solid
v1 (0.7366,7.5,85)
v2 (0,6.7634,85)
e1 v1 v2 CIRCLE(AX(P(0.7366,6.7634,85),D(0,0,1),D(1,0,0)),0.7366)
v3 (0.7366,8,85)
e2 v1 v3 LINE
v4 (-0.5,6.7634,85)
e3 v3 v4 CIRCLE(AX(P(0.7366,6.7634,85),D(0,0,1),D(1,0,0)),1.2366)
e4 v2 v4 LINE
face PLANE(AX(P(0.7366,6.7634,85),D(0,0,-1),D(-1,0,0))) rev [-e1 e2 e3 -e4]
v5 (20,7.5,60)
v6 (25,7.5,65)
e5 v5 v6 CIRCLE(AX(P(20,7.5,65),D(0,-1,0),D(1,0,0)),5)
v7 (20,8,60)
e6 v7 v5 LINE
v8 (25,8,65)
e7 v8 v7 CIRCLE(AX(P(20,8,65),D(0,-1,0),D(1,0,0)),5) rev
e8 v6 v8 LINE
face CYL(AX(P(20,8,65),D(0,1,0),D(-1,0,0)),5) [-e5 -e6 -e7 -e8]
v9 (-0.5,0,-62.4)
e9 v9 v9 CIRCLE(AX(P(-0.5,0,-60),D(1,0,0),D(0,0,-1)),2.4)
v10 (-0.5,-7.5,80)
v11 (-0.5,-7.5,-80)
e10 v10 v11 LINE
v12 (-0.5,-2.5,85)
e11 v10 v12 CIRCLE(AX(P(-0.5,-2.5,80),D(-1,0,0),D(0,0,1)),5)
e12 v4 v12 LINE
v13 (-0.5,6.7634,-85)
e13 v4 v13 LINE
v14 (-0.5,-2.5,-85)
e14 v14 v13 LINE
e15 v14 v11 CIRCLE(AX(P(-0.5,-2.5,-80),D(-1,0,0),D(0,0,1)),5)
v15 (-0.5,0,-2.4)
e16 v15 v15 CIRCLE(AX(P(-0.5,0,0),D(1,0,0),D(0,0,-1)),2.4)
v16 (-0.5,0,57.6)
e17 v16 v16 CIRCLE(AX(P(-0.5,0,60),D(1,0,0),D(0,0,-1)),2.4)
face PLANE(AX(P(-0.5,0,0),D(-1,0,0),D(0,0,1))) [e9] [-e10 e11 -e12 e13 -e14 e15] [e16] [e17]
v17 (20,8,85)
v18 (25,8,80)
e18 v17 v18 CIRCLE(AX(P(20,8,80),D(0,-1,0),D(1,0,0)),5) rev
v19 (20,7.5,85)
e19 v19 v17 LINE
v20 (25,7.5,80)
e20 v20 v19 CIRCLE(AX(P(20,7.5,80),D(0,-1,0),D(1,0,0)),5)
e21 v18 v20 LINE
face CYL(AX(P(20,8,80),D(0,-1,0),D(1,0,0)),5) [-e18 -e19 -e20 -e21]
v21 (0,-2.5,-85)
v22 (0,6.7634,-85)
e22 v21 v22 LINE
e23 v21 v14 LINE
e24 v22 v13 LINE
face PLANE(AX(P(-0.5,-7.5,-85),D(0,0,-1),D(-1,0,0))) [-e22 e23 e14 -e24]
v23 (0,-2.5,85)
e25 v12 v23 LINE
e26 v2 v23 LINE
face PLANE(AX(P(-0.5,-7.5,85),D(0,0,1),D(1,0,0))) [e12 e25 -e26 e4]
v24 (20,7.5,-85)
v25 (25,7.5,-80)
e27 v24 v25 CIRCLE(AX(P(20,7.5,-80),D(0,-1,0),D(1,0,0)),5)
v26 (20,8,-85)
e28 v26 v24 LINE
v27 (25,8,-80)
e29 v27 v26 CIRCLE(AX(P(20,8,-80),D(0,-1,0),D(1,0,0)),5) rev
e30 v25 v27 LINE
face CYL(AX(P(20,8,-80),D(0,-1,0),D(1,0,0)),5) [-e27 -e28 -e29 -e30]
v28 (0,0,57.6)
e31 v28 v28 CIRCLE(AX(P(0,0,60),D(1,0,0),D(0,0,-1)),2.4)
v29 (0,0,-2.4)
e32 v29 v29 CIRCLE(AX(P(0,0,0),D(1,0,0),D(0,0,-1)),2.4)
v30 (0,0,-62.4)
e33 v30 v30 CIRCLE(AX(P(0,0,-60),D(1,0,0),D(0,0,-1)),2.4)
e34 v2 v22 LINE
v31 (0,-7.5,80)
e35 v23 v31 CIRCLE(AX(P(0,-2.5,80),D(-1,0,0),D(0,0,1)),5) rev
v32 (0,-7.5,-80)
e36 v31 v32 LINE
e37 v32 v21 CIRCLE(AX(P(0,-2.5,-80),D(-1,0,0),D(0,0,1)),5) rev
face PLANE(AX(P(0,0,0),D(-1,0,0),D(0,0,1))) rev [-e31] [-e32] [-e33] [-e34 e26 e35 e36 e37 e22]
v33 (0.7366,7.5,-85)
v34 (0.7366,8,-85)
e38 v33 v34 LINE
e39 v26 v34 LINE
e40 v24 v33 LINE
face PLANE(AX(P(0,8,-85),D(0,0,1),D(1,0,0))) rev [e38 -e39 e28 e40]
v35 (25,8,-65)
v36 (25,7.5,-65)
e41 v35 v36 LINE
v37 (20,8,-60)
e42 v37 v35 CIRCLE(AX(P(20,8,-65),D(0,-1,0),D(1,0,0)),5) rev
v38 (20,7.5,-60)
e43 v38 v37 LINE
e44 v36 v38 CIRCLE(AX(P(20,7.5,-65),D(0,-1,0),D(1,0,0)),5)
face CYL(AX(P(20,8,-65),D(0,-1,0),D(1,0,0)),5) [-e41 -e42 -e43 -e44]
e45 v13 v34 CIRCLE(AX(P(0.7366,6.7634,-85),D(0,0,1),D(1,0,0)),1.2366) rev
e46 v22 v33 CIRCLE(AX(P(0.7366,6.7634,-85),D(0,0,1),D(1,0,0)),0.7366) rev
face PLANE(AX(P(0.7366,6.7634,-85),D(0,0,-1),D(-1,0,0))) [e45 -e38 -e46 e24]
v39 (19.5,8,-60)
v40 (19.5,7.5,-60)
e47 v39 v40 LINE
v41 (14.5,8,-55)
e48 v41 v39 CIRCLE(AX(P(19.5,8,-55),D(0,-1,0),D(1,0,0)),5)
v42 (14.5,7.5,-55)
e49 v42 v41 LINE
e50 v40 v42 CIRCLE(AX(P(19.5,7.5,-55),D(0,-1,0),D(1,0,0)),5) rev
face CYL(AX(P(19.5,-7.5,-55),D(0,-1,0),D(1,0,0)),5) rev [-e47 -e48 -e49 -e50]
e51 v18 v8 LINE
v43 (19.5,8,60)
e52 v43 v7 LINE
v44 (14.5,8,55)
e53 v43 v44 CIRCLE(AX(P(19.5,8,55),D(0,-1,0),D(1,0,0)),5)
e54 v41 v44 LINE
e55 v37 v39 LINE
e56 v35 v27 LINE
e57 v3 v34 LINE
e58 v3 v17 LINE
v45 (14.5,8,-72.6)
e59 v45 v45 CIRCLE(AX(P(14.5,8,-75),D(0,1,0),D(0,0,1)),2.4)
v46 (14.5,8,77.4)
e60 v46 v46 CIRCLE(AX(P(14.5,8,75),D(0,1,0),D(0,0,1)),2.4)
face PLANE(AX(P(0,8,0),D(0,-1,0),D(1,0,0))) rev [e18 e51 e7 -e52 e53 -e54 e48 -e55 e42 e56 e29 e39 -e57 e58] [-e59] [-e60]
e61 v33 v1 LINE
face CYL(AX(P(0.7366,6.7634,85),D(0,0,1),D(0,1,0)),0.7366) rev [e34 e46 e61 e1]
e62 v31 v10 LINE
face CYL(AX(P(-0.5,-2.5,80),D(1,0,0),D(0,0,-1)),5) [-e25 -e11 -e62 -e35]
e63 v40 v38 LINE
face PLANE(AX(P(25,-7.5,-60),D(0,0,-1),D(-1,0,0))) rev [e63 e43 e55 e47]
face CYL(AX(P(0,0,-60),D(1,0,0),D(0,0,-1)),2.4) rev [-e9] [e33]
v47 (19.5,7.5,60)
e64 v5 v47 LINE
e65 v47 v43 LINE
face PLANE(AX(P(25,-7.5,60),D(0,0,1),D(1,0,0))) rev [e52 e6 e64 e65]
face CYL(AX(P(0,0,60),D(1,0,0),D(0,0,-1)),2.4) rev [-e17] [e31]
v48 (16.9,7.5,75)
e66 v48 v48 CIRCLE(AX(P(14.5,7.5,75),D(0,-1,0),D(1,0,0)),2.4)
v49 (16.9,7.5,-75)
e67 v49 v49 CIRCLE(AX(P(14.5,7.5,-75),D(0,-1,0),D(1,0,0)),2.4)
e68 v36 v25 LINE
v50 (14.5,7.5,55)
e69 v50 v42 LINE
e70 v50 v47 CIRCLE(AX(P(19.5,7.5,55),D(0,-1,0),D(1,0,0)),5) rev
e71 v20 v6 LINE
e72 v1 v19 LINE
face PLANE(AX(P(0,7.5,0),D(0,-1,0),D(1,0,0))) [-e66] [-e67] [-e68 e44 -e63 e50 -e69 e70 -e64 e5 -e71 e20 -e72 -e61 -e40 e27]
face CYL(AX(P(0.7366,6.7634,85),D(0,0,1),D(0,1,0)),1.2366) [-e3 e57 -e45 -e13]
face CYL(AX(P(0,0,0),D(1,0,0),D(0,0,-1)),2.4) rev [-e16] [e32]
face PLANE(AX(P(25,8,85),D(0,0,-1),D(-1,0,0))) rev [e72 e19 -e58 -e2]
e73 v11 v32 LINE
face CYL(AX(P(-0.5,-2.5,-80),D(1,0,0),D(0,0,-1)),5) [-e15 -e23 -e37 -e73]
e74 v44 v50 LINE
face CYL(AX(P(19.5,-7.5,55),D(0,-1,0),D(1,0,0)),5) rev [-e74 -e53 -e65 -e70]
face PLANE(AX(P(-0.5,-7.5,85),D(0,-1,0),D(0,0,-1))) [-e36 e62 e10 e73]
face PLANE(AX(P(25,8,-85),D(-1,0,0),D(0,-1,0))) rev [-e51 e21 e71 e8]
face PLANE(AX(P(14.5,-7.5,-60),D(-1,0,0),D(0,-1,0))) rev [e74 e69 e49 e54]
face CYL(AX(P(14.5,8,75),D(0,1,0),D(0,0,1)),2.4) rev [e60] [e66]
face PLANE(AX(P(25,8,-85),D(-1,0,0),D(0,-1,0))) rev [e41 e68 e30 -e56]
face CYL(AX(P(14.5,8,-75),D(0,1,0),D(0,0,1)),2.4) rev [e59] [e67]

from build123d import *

# Parameters (mm, degrees)
SKETCH2_W                    = 170
SKETCH2_H                    = 15
BASE_FLANGE1_DEPTH           = 0.5
EDGE_FLANGE1_STRIP_W         = 3.4732
EDGE_FLANGE1_STRIP_H         = 0.5
EDGE_FLANGE1_STRIP_CUT_DEPTH = 170
EDGE_FLANGE1_DEPTH           = 170
M4_CLEARANCE_HOLE1_D         = 4.8
SKETCH14_W                   = 10.5
SKETCH14_H                   = 120
CUT_EXTRUDE1_DEPTH           = 90.945817023
BREAK_CORNER1_START          = 7.5
BREAK_CORNER1_DEPTH          = 0.5
BREAK_CORNER1_START_2        = -0.5
BREAK_CORNER1_2_DEPTH        = 0.5
BREAK_CORNER2_START          = 7.5
BREAK_CORNER2_DEPTH          = 0.5
M4_CLEARANCE_HOLE2_D         = 4.8


# Read off the part's stored shape, not the designer's step: Break-Corner1, Break-Corner2
# Sheet-metal steps are written as plain solids
with BuildPart() as part:
    # Sketch2 → Base-Flange1 (new body)
    with BuildSketch(Plane(origin=(0, 0, 0), x_dir=(0, 0, -1), z_dir=(1, 0, 0))):
        Rectangle(SKETCH2_W, SKETCH2_H)
    extrude(amount=-BASE_FLANGE1_DEPTH)

    # Edge-Flange1 strip (across the edge) → Edge-Flange1 strip cut (cut)
    with BuildSketch(Plane(origin=(0, 7.5, -85), x_dir=(0, -1, 0), z_dir=(0, 0, 1))):
        with Locations((-1, -0.25)):
            Rectangle(EDGE_FLANGE1_STRIP_W, EDGE_FLANGE1_STRIP_H)
    extrude(amount=EDGE_FLANGE1_STRIP_CUT_DEPTH, mode=Mode.SUBTRACT)

    # Edge-Flange1 section (across the edge) → Edge-Flange1 (add)
    with BuildSketch(Plane(origin=(0, 7.5, -85), x_dir=(0, -1, 0), z_dir=(0, 0, 1))):
        with BuildLine():
            Line((-0.5, 0.7366), (-0.5, 25))
            Line((-0.5, 25), (0, 25))
            Line((0, 25), (0, 0.7366))
            ThreePointArc((0, 0.7366), (0.215745145, 0.215745145), (0.7366, 0))
            Line((0.7366, 0), (0.7366, -0.5))
            ThreePointArc((0.7366, -0.5), (-0.137808246, -0.137808246), (-0.5, 0.7366))
        make_face()
    extrude(amount=EDGE_FLANGE1_DEPTH)

    # M4 Clearance Hole1 (through all)
    with Locations(Plane(origin=(0, 8, 0), x_dir=(1, 0, 0), z_dir=(0, 1, 0))):
        with Locations((14.5, 75), (14.5, -75)):
            Hole(M4_CLEARANCE_HOLE1_D / 2)

    # Sketch14 → Cut-Extrude1 (cut, through all)
    with BuildSketch(Plane(origin=(0, 8, 0), x_dir=(1, 0, 0), z_dir=(0, 1, 0))):
        with Locations((19.75, 0)):
            Rectangle(SKETCH14_W, SKETCH14_H)
    extrude(amount=-CUT_EXTRUDE1_DEPTH, mode=Mode.SUBTRACT)

    # Break-Corner1 outline → Break-Corner1 (cut)
    with BuildSketch(Plane(origin=(0, 0, 0), x_dir=(1, 0, 0), z_dir=(0, 1, 0)).offset(BREAK_CORNER1_START)):
        with BuildLine():
            Line((25, -85), (25, -80))
            ThreePointArc((25, -80), (23.535533906, -83.535533906), (20, -85))
            Line((20, -85), (25, -85))
        make_face()
        with BuildLine():
            ThreePointArc((20, -60), (23.535533906, -61.464466094), (25, -65))
            Line((25, -65), (25, -60))
            Line((25, -60), (20, -60))
        make_face()
        with BuildLine():
            Line((25, 85), (20, 85))
            ThreePointArc((20, 85), (23.535533906, 83.535533906), (25, 80))
            Line((25, 80), (25, 85))
        make_face()
        with BuildLine():
            Line((25, 60), (25, 65))
            ThreePointArc((25, 65), (23.535533906, 61.464466094), (20, 60))
            Line((20, 60), (25, 60))
        make_face()
    extrude(amount=BREAK_CORNER1_DEPTH, mode=Mode.SUBTRACT)

    # Break-Corner1 2 outline → Break-Corner1 2 (cut)
    with BuildSketch(Plane.YZ.offset(BREAK_CORNER1_START_2)):
        with BuildLine():
            Line((-7.5, 85), (-7.5, 80))
            ThreePointArc((-7.5, 80), (-6.035533906, 83.535533906), (-2.5, 85))
            Line((-2.5, 85), (-7.5, 85))
        make_face()
        with BuildLine():
            ThreePointArc((-2.5, -85), (-6.035533906, -83.535533906), (-7.5, -80))
            Line((-7.5, -80), (-7.5, -85))
            Line((-7.5, -85), (-2.5, -85))
        make_face()
    extrude(amount=BREAK_CORNER1_2_DEPTH, mode=Mode.SUBTRACT)

    # Break-Corner2 outline → Break-Corner2 (add)
    with BuildSketch(Plane(origin=(0, 0, 0), x_dir=(1, 0, 0), z_dir=(0, 1, 0)).offset(BREAK_CORNER2_START)):
        with BuildLine():
            Line((14.5, 60), (14.5, 55))
            ThreePointArc((14.5, 55), (15.964466094, 58.535533906), (19.5, 60))
            Line((19.5, 60), (14.5, 60))
        make_face()
        with BuildLine():
            ThreePointArc((19.5, -60), (15.964466094, -58.535533906), (14.5, -55))
            Line((14.5, -55), (14.5, -60))
            Line((14.5, -60), (19.5, -60))
        make_face()
    extrude(amount=BREAK_CORNER2_DEPTH)

    # M4 Clearance Hole2 (through all)
    with Locations(Plane(origin=(0, 0, 0), x_dir=(0, 0, -1), z_dir=(1, 0, 0))):
        with Locations((-60, 0), (0, 0), (60, 0)):
            Hole(M4_CLEARANCE_HOLE2_D / 2)


solid = part.part
